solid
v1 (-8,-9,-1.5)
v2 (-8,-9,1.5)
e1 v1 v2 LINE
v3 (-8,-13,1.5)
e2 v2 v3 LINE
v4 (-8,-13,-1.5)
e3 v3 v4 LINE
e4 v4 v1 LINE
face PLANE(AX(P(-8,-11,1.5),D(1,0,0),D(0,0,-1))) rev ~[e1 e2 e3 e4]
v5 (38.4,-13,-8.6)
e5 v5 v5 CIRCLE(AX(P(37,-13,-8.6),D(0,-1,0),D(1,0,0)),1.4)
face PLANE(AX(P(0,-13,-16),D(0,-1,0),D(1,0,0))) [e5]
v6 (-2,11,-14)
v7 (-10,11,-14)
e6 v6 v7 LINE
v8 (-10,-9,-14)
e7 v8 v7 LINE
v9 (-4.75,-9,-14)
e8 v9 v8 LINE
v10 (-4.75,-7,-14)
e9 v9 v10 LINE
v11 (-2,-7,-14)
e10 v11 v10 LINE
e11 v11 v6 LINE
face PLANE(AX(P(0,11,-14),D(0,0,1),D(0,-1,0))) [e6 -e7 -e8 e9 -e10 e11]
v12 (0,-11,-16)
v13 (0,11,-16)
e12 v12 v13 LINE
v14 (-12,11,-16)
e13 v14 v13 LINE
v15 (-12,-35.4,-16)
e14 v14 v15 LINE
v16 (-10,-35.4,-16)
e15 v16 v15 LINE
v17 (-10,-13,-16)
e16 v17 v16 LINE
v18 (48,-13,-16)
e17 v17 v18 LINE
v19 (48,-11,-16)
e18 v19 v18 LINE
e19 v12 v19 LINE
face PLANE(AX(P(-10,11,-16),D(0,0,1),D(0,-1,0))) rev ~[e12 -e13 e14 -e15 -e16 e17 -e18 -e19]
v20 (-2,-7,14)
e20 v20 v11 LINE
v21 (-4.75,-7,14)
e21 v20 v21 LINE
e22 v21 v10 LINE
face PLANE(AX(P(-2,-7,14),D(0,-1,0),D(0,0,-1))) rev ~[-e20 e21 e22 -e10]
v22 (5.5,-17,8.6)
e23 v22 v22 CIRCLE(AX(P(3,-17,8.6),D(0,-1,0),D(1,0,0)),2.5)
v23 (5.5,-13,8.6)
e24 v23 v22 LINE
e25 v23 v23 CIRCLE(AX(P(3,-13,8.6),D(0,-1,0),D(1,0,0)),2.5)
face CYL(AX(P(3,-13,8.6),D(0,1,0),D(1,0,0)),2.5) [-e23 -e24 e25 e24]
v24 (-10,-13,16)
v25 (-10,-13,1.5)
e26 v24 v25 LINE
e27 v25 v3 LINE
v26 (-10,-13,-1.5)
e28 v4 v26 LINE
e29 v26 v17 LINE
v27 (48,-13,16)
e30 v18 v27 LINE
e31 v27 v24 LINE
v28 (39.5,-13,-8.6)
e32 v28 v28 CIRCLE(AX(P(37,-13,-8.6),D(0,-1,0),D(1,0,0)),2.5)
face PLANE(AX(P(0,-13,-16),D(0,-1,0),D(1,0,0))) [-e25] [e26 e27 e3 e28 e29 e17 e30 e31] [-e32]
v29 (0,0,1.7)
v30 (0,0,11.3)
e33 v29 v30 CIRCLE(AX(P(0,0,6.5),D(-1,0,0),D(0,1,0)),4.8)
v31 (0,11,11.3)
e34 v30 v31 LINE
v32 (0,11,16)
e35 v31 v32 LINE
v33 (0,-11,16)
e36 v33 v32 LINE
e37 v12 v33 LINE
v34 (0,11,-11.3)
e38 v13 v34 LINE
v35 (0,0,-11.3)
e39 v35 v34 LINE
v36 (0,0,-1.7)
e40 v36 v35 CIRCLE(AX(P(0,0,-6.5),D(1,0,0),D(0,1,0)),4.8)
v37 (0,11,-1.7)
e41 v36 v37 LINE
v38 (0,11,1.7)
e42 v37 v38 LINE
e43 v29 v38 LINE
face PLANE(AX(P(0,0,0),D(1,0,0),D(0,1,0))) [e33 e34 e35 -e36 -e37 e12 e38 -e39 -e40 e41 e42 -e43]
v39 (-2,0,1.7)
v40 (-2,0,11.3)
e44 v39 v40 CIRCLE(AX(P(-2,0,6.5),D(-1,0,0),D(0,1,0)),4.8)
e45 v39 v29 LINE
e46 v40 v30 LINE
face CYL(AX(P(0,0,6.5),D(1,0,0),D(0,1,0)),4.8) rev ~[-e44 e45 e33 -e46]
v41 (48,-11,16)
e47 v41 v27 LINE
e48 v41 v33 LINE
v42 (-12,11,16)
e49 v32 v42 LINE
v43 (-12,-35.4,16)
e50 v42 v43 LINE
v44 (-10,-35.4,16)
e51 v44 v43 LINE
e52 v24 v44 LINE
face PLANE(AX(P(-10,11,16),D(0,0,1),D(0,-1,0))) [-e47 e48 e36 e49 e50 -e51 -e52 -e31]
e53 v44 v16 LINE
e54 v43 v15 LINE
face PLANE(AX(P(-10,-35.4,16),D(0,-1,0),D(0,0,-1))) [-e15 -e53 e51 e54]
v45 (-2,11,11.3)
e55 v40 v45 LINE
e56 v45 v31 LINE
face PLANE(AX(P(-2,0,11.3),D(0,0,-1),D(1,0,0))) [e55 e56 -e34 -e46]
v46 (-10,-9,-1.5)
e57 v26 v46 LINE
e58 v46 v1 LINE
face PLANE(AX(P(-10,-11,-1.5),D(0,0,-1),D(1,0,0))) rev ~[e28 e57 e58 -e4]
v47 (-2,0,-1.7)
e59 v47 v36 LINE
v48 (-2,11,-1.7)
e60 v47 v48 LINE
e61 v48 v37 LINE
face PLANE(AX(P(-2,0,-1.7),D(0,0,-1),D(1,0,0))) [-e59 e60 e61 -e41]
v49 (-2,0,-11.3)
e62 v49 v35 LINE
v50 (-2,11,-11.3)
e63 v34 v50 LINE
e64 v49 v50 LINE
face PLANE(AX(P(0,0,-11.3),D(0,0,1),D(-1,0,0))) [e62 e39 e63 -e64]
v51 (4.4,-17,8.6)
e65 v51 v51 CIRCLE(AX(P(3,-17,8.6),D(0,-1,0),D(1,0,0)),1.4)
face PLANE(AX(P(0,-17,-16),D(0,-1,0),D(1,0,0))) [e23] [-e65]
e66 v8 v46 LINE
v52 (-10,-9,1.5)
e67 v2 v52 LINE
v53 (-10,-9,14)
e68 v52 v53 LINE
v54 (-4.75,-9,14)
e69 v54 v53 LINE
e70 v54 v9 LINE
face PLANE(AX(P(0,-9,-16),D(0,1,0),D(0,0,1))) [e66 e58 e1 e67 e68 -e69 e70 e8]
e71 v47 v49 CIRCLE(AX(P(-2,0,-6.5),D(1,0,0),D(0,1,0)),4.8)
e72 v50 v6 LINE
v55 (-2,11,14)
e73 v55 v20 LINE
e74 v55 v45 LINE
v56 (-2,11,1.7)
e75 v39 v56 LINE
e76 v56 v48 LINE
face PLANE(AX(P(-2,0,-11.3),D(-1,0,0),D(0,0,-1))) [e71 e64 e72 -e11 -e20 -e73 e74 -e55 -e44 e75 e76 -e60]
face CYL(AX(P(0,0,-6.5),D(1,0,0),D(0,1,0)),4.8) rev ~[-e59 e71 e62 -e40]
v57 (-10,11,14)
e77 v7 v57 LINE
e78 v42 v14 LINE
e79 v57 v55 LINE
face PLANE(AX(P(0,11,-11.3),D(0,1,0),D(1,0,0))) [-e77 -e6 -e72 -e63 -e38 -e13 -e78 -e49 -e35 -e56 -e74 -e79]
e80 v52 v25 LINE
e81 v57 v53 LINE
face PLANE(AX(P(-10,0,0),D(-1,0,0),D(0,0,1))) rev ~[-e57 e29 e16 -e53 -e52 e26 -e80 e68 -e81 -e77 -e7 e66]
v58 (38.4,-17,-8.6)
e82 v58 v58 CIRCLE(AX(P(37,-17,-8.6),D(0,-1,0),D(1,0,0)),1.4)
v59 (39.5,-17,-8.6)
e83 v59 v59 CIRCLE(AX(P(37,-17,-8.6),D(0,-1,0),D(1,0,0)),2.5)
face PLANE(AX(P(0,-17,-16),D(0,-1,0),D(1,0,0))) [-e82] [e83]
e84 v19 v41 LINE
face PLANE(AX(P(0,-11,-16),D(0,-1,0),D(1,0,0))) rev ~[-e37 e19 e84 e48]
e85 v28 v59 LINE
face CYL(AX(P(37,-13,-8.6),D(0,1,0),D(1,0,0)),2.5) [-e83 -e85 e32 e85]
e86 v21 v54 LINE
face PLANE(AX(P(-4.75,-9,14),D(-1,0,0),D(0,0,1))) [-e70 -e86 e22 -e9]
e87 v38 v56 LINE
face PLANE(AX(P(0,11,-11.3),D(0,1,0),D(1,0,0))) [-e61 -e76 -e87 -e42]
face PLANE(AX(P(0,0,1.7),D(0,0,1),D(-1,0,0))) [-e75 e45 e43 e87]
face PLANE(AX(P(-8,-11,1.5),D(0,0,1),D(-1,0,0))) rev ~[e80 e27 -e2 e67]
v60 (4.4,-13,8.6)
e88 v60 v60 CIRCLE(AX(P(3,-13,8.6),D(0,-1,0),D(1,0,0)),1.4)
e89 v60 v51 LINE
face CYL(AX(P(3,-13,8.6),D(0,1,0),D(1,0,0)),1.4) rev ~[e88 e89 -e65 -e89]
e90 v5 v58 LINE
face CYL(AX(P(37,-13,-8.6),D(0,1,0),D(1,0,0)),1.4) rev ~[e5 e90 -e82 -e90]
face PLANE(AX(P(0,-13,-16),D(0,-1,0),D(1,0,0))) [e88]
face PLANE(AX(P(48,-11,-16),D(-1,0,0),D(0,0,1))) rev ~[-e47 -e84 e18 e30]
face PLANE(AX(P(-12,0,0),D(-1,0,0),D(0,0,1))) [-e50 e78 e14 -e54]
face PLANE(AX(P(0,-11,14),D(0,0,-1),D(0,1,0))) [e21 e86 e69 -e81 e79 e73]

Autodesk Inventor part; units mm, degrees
ref_plane "YZ Plane" through (0, 0, 0) normal (1, 0, 0) x (0, 1, 0)
ref_plane "XZ Plane" through (0, 0, 0) normal (0, 1, 0) x (-1, 0, 0)
ref_plane "XY Plane" through (0, 0, 0) normal (0, 0, 1) x (1, 0, 0)
sketch "Sketch2" plane through (0, 0, 0) normal (1, 0, 0) x (0, 1, 0)
  line L0 (11, -16) -> (-11, -16)
  line L1 (-11, -16) -> (-11, 16)
  line L2 (-11, 16) -> (11, 16)
  line L3 (11, 16) -> (11, -16)
  line L4 (11, -16) -> (-11, 16) construction
  line L5 (-11, -16) -> (11, 16) construction
  circle A0 centre (0, -6.5) radius 4.8
  circle A1 centre (0, 6.5) radius 4.8
  line L6 (0, 6.5) -> (0, 0)
  point P0 (0, 0)
  dimension "d8" = 22
  dimension "d9" = 32
  dimension "d14" = 9.6
  dimension "d15" = 13
  dimension "d23" = 6.5
  dimension "d24" = 9.6
  dimension "d25" = 13
extrude "Extrusion2" add sketch "Sketch2" against normal blind 10
shell "Shell1" thickness 2 removed faces 3 at (-10, 8.8868, -1.7838) at (-6.6667, 4.7378, -7.27) at (-6.6667, 4.7378, 5.73)
sketch "Sketch4" plane through (0, 0, 0) normal (0, 1, 0) x (-1, 0, 0)
  line L0 (2, -14) -> (2, 14) projected
  line L1 (2, 0) -> (4.75, 0) construction
  line L2 (4.75, -11.3497) -> (6.75, -11.3497)
  line L3 (6.75, -11.3497) -> (6.75, 11.3497)
  line L4 (6.75, 11.3497) -> (4.75, 11.3497)
  line L5 (4.75, 11.3497) -> (4.75, -11.3497)
  point P0 (0, 0)
  dimension "d19" = 2.75
  dimension "d20" = 2
extrude "Extrusion4" [suppressed]
sketch "Sketch5" plane through (0, -11, -16) normal (0, -1, 0) x (1, 0, 0)
  line L0 (-10, 2) -> (-10, 30) projected
  line L1 (-8, 17.5) -> (-10, 17.5)
  line L2 (-10, 17.5) -> (-10, 14.5)
  line L3 (-10, 14.5) -> (-8, 14.5)
  line L4 (-8, 14.5) -> (-8, 17.5)
  line L5 (-8, 17.5) -> (-10, 14.5) construction
  line L6 (-10, 17.5) -> (-8, 14.5) construction
  line L7 (-10, 0) -> (-10, 32) projected
  point P0 (0, 16)
  dimension "d27" = 3
  dimension "d30" = 2
extrude "Extrusion5" cut sketch "Sketch5" against normal blind 2
sketch "Sketch6" plane through (-2, -9, 14) normal (-1, 0, 0) x (0, 0, 1)
  line L0 (0, 18) -> (0, 0) projected
  line L1 (-28, 16) -> (0, 16)
  line L2 (0, 16) -> (0, 2)
  line L3 (0, 2) -> (-28, 2)
  line L4 (-28, 2) -> (-28, 16)
  line L5 (-28, 16) -> (0, 2) construction
  line L6 (0, 16) -> (-28, 2) construction
  line L7 (-28, 18) -> (0, 18)
  line L8 (0, 18) -> (0, 0)
  line L9 (0, 0) -> (-28, 0)
  line L10 (-28, 0) -> (-28, 18)
  line L11 (-28, 18) -> (0, 0) construction
  line L12 (0, 18) -> (-28, 0) construction
  point P0 (-14, 9)
  dimension "d31" = 14
extrude "Extrusion6" add sketch "Sketch6" along normal blind 2.75 contours L0 L1 L10 L7 | L0 L9 L10 L3
sketch "Sketch7" plane through (0, -11, -16) normal (0, -1, 0) x (1, 0, 0)
  circle A0 centre (37, 7.4) radius 2.5 projected
  circle A1 centre (3, 24.6) radius 2.5 projected
  line L0 (-10, 14.5) -> (-10, 0) projected
  line L1 (-10, 0) -> (48, 0) projected
  line L2 (48, 0) -> (48, 32) projected
  line L3 (48, 32) -> (-10, 32) projected
  line L4 (-10, 32) -> (-10, 17.5) projected
  line L5 (-10, 17.5) -> (-8, 17.5) projected
  line L6 (-8, 17.5) -> (-8, 14.5) projected
  line L7 (-8, 14.5) -> (-10, 14.5) projected
  line L8 (-6.75, 4.6503) -> (-6.75, 27.3497) projected
  line L9 (-6.75, 27.3497) -> (-4.75, 27.3497) projected
  line L10 (-4.75, 27.3497) -> (-4.75, 4.6503) projected
  line L11 (-4.75, 4.6503) -> (-6.75, 4.6503) projected
  line L12 (-10, 0) -> (-10, 32) projected
  point P0 (0, 16)
extrude "Extrusion7" add sketch "Sketch7" along normal blind 2 contours A0 | A1 | L7 L6 L5 L4 L3 L2 L1 L0 | L8 L9 L10 L11
sketch "Sketch8" plane through (-10, 0, 0) normal (-1, 0, 0) x (0, 0, 1)
  line L0 (16, 11) -> (-16, 11) projected
  line L1 (-16, 11) -> (-16, -35.4) projected
  line L2 (16, -35.4) -> (-16, -35.4) projected
  line L3 (16, 11) -> (16, -35.4) projected
  point P0 (0, 0)
extrude "Extrusion8" add sketch "Sketch8" along normal blind 2
sketch "Sketch9" plane through (0, -13, -16) normal (0, -1, 0) x (1, 0, 0)
  circle A0 centre (37, 7.4) radius 1.4 projected
  circle A1 centre (37, 7.4) radius 2.5 projected
  circle A2 centre (3, 24.6) radius 1.4 projected
  circle A3 centre (3, 24.6) radius 2.5 projected
  point P0 (0, 16)
extrude "Extrusion9" add sketch "Sketch9" along normal blind 4
sketch "Sketch10" plane through (0, 0, 0) normal (1, 0, 0) x (0, 0, -1)
  line L0 (-16, 11) -> (-16, -11) projected
  line L1 (-16, -11) -> (16, -11) projected
  line L2 (16, -11) -> (16, 11) projected
  line L3 (16, 11) -> (-16, 11) projected
  circle A0 centre (-6.5, 0) radius 4.8 projected
  circle A1 centre (6.5, 0) radius 4.8 projected
  line L4 (16, -11) -> (16, 11) projected
  line L5 (16, 0) -> (-16, 0)
  line L6 (-16, -35.4) -> (-16, 11) projected
  line L7 (-16, 11) -> (16, 11)
  line L8 (16, 11) -> (16, 0)
  line L9 (16, 0) -> (-16, 0)
  line L10 (-16, 0) -> (-16, 11)
  point P0 (0, 0)
  point P1 (11.3, 0)
  point P2 (-11.3, 0)
  point P3 (-1.7, 0)
  point P4 (1.7, 0)
extrude "Extrusion10" cut sketch "Sketch10" against normal blind 12 contours L3 L2 L5 A1 A0 L0 | A0 L5 | L5 A1 picked at (-5.9326, 1.496) picked at (7.6976, 1.061)
sketch "Sketch11" plane through (-8, -9, 1.5) normal (0, 1, 0) x (1, 0, 0)
  line L0 (1.45, 12.6493) -> (1.45, -9.6497) projected
  line L1 (3.05, 12.6493) -> (1.45, 12.6493) projected
  line L2 (1.45, -9.6497) -> (3.05, -9.6497) projected
  line L3 (1.45, 12.6493) -> (3.2385, 12.6493)
  line L4 (3.2385, 12.6493) -> (3.2385, -9.6497)
  line L5 (3.2385, -9.6497) -> (1.45, -9.6497)
  line L6 (1.45, -9.6497) -> (1.45, 12.6493)
  point P0 (8, 1.5)
extrude "Extrusion11" [suppressed]
sketch "Sketch12" plane through (0, 0, -11.3) normal (0, 1, 0) x (1, 0, 0)
  line L0 (-2, -9.6) -> (0, -9.6) projected
  line L1 (-2, -13) -> (-2, -9.6) projected
  line L2 (0, -13) -> (-2, -13) projected
  line L3 (0, -9.6) -> (0, -13) projected
  line L4 (0, 0) -> (-2, 0) projected
  line L5 (0, 4.7) -> (0, 0) projected
  line L6 (-12, 4.7) -> (0, 4.7) projected
  line L7 (-12, -27.3) -> (-12, 4.7) projected
  line L8 (0, -27.3) -> (-12, -27.3) projected
  line L9 (0, -22.6) -> (0, -27.3) projected
  line L10 (-2, -22.6) -> (0, -22.6) projected
  line L11 (-2, -25.3) -> (-2, -22.6) projected
  line L12 (-10, -25.3) -> (-2, -25.3) projected
  line L13 (-10, 2.7) -> (-10, -25.3) projected
  line L14 (-2, 2.7) -> (-10, 2.7) projected
  line L15 (-2, 0) -> (-2, 2.7) projected
  point P0 (0, -11.3)
extrude "Extrusion12" add sketch "Sketch12" along normal blind 11
properties part number "snapConnector_3DPrint"
